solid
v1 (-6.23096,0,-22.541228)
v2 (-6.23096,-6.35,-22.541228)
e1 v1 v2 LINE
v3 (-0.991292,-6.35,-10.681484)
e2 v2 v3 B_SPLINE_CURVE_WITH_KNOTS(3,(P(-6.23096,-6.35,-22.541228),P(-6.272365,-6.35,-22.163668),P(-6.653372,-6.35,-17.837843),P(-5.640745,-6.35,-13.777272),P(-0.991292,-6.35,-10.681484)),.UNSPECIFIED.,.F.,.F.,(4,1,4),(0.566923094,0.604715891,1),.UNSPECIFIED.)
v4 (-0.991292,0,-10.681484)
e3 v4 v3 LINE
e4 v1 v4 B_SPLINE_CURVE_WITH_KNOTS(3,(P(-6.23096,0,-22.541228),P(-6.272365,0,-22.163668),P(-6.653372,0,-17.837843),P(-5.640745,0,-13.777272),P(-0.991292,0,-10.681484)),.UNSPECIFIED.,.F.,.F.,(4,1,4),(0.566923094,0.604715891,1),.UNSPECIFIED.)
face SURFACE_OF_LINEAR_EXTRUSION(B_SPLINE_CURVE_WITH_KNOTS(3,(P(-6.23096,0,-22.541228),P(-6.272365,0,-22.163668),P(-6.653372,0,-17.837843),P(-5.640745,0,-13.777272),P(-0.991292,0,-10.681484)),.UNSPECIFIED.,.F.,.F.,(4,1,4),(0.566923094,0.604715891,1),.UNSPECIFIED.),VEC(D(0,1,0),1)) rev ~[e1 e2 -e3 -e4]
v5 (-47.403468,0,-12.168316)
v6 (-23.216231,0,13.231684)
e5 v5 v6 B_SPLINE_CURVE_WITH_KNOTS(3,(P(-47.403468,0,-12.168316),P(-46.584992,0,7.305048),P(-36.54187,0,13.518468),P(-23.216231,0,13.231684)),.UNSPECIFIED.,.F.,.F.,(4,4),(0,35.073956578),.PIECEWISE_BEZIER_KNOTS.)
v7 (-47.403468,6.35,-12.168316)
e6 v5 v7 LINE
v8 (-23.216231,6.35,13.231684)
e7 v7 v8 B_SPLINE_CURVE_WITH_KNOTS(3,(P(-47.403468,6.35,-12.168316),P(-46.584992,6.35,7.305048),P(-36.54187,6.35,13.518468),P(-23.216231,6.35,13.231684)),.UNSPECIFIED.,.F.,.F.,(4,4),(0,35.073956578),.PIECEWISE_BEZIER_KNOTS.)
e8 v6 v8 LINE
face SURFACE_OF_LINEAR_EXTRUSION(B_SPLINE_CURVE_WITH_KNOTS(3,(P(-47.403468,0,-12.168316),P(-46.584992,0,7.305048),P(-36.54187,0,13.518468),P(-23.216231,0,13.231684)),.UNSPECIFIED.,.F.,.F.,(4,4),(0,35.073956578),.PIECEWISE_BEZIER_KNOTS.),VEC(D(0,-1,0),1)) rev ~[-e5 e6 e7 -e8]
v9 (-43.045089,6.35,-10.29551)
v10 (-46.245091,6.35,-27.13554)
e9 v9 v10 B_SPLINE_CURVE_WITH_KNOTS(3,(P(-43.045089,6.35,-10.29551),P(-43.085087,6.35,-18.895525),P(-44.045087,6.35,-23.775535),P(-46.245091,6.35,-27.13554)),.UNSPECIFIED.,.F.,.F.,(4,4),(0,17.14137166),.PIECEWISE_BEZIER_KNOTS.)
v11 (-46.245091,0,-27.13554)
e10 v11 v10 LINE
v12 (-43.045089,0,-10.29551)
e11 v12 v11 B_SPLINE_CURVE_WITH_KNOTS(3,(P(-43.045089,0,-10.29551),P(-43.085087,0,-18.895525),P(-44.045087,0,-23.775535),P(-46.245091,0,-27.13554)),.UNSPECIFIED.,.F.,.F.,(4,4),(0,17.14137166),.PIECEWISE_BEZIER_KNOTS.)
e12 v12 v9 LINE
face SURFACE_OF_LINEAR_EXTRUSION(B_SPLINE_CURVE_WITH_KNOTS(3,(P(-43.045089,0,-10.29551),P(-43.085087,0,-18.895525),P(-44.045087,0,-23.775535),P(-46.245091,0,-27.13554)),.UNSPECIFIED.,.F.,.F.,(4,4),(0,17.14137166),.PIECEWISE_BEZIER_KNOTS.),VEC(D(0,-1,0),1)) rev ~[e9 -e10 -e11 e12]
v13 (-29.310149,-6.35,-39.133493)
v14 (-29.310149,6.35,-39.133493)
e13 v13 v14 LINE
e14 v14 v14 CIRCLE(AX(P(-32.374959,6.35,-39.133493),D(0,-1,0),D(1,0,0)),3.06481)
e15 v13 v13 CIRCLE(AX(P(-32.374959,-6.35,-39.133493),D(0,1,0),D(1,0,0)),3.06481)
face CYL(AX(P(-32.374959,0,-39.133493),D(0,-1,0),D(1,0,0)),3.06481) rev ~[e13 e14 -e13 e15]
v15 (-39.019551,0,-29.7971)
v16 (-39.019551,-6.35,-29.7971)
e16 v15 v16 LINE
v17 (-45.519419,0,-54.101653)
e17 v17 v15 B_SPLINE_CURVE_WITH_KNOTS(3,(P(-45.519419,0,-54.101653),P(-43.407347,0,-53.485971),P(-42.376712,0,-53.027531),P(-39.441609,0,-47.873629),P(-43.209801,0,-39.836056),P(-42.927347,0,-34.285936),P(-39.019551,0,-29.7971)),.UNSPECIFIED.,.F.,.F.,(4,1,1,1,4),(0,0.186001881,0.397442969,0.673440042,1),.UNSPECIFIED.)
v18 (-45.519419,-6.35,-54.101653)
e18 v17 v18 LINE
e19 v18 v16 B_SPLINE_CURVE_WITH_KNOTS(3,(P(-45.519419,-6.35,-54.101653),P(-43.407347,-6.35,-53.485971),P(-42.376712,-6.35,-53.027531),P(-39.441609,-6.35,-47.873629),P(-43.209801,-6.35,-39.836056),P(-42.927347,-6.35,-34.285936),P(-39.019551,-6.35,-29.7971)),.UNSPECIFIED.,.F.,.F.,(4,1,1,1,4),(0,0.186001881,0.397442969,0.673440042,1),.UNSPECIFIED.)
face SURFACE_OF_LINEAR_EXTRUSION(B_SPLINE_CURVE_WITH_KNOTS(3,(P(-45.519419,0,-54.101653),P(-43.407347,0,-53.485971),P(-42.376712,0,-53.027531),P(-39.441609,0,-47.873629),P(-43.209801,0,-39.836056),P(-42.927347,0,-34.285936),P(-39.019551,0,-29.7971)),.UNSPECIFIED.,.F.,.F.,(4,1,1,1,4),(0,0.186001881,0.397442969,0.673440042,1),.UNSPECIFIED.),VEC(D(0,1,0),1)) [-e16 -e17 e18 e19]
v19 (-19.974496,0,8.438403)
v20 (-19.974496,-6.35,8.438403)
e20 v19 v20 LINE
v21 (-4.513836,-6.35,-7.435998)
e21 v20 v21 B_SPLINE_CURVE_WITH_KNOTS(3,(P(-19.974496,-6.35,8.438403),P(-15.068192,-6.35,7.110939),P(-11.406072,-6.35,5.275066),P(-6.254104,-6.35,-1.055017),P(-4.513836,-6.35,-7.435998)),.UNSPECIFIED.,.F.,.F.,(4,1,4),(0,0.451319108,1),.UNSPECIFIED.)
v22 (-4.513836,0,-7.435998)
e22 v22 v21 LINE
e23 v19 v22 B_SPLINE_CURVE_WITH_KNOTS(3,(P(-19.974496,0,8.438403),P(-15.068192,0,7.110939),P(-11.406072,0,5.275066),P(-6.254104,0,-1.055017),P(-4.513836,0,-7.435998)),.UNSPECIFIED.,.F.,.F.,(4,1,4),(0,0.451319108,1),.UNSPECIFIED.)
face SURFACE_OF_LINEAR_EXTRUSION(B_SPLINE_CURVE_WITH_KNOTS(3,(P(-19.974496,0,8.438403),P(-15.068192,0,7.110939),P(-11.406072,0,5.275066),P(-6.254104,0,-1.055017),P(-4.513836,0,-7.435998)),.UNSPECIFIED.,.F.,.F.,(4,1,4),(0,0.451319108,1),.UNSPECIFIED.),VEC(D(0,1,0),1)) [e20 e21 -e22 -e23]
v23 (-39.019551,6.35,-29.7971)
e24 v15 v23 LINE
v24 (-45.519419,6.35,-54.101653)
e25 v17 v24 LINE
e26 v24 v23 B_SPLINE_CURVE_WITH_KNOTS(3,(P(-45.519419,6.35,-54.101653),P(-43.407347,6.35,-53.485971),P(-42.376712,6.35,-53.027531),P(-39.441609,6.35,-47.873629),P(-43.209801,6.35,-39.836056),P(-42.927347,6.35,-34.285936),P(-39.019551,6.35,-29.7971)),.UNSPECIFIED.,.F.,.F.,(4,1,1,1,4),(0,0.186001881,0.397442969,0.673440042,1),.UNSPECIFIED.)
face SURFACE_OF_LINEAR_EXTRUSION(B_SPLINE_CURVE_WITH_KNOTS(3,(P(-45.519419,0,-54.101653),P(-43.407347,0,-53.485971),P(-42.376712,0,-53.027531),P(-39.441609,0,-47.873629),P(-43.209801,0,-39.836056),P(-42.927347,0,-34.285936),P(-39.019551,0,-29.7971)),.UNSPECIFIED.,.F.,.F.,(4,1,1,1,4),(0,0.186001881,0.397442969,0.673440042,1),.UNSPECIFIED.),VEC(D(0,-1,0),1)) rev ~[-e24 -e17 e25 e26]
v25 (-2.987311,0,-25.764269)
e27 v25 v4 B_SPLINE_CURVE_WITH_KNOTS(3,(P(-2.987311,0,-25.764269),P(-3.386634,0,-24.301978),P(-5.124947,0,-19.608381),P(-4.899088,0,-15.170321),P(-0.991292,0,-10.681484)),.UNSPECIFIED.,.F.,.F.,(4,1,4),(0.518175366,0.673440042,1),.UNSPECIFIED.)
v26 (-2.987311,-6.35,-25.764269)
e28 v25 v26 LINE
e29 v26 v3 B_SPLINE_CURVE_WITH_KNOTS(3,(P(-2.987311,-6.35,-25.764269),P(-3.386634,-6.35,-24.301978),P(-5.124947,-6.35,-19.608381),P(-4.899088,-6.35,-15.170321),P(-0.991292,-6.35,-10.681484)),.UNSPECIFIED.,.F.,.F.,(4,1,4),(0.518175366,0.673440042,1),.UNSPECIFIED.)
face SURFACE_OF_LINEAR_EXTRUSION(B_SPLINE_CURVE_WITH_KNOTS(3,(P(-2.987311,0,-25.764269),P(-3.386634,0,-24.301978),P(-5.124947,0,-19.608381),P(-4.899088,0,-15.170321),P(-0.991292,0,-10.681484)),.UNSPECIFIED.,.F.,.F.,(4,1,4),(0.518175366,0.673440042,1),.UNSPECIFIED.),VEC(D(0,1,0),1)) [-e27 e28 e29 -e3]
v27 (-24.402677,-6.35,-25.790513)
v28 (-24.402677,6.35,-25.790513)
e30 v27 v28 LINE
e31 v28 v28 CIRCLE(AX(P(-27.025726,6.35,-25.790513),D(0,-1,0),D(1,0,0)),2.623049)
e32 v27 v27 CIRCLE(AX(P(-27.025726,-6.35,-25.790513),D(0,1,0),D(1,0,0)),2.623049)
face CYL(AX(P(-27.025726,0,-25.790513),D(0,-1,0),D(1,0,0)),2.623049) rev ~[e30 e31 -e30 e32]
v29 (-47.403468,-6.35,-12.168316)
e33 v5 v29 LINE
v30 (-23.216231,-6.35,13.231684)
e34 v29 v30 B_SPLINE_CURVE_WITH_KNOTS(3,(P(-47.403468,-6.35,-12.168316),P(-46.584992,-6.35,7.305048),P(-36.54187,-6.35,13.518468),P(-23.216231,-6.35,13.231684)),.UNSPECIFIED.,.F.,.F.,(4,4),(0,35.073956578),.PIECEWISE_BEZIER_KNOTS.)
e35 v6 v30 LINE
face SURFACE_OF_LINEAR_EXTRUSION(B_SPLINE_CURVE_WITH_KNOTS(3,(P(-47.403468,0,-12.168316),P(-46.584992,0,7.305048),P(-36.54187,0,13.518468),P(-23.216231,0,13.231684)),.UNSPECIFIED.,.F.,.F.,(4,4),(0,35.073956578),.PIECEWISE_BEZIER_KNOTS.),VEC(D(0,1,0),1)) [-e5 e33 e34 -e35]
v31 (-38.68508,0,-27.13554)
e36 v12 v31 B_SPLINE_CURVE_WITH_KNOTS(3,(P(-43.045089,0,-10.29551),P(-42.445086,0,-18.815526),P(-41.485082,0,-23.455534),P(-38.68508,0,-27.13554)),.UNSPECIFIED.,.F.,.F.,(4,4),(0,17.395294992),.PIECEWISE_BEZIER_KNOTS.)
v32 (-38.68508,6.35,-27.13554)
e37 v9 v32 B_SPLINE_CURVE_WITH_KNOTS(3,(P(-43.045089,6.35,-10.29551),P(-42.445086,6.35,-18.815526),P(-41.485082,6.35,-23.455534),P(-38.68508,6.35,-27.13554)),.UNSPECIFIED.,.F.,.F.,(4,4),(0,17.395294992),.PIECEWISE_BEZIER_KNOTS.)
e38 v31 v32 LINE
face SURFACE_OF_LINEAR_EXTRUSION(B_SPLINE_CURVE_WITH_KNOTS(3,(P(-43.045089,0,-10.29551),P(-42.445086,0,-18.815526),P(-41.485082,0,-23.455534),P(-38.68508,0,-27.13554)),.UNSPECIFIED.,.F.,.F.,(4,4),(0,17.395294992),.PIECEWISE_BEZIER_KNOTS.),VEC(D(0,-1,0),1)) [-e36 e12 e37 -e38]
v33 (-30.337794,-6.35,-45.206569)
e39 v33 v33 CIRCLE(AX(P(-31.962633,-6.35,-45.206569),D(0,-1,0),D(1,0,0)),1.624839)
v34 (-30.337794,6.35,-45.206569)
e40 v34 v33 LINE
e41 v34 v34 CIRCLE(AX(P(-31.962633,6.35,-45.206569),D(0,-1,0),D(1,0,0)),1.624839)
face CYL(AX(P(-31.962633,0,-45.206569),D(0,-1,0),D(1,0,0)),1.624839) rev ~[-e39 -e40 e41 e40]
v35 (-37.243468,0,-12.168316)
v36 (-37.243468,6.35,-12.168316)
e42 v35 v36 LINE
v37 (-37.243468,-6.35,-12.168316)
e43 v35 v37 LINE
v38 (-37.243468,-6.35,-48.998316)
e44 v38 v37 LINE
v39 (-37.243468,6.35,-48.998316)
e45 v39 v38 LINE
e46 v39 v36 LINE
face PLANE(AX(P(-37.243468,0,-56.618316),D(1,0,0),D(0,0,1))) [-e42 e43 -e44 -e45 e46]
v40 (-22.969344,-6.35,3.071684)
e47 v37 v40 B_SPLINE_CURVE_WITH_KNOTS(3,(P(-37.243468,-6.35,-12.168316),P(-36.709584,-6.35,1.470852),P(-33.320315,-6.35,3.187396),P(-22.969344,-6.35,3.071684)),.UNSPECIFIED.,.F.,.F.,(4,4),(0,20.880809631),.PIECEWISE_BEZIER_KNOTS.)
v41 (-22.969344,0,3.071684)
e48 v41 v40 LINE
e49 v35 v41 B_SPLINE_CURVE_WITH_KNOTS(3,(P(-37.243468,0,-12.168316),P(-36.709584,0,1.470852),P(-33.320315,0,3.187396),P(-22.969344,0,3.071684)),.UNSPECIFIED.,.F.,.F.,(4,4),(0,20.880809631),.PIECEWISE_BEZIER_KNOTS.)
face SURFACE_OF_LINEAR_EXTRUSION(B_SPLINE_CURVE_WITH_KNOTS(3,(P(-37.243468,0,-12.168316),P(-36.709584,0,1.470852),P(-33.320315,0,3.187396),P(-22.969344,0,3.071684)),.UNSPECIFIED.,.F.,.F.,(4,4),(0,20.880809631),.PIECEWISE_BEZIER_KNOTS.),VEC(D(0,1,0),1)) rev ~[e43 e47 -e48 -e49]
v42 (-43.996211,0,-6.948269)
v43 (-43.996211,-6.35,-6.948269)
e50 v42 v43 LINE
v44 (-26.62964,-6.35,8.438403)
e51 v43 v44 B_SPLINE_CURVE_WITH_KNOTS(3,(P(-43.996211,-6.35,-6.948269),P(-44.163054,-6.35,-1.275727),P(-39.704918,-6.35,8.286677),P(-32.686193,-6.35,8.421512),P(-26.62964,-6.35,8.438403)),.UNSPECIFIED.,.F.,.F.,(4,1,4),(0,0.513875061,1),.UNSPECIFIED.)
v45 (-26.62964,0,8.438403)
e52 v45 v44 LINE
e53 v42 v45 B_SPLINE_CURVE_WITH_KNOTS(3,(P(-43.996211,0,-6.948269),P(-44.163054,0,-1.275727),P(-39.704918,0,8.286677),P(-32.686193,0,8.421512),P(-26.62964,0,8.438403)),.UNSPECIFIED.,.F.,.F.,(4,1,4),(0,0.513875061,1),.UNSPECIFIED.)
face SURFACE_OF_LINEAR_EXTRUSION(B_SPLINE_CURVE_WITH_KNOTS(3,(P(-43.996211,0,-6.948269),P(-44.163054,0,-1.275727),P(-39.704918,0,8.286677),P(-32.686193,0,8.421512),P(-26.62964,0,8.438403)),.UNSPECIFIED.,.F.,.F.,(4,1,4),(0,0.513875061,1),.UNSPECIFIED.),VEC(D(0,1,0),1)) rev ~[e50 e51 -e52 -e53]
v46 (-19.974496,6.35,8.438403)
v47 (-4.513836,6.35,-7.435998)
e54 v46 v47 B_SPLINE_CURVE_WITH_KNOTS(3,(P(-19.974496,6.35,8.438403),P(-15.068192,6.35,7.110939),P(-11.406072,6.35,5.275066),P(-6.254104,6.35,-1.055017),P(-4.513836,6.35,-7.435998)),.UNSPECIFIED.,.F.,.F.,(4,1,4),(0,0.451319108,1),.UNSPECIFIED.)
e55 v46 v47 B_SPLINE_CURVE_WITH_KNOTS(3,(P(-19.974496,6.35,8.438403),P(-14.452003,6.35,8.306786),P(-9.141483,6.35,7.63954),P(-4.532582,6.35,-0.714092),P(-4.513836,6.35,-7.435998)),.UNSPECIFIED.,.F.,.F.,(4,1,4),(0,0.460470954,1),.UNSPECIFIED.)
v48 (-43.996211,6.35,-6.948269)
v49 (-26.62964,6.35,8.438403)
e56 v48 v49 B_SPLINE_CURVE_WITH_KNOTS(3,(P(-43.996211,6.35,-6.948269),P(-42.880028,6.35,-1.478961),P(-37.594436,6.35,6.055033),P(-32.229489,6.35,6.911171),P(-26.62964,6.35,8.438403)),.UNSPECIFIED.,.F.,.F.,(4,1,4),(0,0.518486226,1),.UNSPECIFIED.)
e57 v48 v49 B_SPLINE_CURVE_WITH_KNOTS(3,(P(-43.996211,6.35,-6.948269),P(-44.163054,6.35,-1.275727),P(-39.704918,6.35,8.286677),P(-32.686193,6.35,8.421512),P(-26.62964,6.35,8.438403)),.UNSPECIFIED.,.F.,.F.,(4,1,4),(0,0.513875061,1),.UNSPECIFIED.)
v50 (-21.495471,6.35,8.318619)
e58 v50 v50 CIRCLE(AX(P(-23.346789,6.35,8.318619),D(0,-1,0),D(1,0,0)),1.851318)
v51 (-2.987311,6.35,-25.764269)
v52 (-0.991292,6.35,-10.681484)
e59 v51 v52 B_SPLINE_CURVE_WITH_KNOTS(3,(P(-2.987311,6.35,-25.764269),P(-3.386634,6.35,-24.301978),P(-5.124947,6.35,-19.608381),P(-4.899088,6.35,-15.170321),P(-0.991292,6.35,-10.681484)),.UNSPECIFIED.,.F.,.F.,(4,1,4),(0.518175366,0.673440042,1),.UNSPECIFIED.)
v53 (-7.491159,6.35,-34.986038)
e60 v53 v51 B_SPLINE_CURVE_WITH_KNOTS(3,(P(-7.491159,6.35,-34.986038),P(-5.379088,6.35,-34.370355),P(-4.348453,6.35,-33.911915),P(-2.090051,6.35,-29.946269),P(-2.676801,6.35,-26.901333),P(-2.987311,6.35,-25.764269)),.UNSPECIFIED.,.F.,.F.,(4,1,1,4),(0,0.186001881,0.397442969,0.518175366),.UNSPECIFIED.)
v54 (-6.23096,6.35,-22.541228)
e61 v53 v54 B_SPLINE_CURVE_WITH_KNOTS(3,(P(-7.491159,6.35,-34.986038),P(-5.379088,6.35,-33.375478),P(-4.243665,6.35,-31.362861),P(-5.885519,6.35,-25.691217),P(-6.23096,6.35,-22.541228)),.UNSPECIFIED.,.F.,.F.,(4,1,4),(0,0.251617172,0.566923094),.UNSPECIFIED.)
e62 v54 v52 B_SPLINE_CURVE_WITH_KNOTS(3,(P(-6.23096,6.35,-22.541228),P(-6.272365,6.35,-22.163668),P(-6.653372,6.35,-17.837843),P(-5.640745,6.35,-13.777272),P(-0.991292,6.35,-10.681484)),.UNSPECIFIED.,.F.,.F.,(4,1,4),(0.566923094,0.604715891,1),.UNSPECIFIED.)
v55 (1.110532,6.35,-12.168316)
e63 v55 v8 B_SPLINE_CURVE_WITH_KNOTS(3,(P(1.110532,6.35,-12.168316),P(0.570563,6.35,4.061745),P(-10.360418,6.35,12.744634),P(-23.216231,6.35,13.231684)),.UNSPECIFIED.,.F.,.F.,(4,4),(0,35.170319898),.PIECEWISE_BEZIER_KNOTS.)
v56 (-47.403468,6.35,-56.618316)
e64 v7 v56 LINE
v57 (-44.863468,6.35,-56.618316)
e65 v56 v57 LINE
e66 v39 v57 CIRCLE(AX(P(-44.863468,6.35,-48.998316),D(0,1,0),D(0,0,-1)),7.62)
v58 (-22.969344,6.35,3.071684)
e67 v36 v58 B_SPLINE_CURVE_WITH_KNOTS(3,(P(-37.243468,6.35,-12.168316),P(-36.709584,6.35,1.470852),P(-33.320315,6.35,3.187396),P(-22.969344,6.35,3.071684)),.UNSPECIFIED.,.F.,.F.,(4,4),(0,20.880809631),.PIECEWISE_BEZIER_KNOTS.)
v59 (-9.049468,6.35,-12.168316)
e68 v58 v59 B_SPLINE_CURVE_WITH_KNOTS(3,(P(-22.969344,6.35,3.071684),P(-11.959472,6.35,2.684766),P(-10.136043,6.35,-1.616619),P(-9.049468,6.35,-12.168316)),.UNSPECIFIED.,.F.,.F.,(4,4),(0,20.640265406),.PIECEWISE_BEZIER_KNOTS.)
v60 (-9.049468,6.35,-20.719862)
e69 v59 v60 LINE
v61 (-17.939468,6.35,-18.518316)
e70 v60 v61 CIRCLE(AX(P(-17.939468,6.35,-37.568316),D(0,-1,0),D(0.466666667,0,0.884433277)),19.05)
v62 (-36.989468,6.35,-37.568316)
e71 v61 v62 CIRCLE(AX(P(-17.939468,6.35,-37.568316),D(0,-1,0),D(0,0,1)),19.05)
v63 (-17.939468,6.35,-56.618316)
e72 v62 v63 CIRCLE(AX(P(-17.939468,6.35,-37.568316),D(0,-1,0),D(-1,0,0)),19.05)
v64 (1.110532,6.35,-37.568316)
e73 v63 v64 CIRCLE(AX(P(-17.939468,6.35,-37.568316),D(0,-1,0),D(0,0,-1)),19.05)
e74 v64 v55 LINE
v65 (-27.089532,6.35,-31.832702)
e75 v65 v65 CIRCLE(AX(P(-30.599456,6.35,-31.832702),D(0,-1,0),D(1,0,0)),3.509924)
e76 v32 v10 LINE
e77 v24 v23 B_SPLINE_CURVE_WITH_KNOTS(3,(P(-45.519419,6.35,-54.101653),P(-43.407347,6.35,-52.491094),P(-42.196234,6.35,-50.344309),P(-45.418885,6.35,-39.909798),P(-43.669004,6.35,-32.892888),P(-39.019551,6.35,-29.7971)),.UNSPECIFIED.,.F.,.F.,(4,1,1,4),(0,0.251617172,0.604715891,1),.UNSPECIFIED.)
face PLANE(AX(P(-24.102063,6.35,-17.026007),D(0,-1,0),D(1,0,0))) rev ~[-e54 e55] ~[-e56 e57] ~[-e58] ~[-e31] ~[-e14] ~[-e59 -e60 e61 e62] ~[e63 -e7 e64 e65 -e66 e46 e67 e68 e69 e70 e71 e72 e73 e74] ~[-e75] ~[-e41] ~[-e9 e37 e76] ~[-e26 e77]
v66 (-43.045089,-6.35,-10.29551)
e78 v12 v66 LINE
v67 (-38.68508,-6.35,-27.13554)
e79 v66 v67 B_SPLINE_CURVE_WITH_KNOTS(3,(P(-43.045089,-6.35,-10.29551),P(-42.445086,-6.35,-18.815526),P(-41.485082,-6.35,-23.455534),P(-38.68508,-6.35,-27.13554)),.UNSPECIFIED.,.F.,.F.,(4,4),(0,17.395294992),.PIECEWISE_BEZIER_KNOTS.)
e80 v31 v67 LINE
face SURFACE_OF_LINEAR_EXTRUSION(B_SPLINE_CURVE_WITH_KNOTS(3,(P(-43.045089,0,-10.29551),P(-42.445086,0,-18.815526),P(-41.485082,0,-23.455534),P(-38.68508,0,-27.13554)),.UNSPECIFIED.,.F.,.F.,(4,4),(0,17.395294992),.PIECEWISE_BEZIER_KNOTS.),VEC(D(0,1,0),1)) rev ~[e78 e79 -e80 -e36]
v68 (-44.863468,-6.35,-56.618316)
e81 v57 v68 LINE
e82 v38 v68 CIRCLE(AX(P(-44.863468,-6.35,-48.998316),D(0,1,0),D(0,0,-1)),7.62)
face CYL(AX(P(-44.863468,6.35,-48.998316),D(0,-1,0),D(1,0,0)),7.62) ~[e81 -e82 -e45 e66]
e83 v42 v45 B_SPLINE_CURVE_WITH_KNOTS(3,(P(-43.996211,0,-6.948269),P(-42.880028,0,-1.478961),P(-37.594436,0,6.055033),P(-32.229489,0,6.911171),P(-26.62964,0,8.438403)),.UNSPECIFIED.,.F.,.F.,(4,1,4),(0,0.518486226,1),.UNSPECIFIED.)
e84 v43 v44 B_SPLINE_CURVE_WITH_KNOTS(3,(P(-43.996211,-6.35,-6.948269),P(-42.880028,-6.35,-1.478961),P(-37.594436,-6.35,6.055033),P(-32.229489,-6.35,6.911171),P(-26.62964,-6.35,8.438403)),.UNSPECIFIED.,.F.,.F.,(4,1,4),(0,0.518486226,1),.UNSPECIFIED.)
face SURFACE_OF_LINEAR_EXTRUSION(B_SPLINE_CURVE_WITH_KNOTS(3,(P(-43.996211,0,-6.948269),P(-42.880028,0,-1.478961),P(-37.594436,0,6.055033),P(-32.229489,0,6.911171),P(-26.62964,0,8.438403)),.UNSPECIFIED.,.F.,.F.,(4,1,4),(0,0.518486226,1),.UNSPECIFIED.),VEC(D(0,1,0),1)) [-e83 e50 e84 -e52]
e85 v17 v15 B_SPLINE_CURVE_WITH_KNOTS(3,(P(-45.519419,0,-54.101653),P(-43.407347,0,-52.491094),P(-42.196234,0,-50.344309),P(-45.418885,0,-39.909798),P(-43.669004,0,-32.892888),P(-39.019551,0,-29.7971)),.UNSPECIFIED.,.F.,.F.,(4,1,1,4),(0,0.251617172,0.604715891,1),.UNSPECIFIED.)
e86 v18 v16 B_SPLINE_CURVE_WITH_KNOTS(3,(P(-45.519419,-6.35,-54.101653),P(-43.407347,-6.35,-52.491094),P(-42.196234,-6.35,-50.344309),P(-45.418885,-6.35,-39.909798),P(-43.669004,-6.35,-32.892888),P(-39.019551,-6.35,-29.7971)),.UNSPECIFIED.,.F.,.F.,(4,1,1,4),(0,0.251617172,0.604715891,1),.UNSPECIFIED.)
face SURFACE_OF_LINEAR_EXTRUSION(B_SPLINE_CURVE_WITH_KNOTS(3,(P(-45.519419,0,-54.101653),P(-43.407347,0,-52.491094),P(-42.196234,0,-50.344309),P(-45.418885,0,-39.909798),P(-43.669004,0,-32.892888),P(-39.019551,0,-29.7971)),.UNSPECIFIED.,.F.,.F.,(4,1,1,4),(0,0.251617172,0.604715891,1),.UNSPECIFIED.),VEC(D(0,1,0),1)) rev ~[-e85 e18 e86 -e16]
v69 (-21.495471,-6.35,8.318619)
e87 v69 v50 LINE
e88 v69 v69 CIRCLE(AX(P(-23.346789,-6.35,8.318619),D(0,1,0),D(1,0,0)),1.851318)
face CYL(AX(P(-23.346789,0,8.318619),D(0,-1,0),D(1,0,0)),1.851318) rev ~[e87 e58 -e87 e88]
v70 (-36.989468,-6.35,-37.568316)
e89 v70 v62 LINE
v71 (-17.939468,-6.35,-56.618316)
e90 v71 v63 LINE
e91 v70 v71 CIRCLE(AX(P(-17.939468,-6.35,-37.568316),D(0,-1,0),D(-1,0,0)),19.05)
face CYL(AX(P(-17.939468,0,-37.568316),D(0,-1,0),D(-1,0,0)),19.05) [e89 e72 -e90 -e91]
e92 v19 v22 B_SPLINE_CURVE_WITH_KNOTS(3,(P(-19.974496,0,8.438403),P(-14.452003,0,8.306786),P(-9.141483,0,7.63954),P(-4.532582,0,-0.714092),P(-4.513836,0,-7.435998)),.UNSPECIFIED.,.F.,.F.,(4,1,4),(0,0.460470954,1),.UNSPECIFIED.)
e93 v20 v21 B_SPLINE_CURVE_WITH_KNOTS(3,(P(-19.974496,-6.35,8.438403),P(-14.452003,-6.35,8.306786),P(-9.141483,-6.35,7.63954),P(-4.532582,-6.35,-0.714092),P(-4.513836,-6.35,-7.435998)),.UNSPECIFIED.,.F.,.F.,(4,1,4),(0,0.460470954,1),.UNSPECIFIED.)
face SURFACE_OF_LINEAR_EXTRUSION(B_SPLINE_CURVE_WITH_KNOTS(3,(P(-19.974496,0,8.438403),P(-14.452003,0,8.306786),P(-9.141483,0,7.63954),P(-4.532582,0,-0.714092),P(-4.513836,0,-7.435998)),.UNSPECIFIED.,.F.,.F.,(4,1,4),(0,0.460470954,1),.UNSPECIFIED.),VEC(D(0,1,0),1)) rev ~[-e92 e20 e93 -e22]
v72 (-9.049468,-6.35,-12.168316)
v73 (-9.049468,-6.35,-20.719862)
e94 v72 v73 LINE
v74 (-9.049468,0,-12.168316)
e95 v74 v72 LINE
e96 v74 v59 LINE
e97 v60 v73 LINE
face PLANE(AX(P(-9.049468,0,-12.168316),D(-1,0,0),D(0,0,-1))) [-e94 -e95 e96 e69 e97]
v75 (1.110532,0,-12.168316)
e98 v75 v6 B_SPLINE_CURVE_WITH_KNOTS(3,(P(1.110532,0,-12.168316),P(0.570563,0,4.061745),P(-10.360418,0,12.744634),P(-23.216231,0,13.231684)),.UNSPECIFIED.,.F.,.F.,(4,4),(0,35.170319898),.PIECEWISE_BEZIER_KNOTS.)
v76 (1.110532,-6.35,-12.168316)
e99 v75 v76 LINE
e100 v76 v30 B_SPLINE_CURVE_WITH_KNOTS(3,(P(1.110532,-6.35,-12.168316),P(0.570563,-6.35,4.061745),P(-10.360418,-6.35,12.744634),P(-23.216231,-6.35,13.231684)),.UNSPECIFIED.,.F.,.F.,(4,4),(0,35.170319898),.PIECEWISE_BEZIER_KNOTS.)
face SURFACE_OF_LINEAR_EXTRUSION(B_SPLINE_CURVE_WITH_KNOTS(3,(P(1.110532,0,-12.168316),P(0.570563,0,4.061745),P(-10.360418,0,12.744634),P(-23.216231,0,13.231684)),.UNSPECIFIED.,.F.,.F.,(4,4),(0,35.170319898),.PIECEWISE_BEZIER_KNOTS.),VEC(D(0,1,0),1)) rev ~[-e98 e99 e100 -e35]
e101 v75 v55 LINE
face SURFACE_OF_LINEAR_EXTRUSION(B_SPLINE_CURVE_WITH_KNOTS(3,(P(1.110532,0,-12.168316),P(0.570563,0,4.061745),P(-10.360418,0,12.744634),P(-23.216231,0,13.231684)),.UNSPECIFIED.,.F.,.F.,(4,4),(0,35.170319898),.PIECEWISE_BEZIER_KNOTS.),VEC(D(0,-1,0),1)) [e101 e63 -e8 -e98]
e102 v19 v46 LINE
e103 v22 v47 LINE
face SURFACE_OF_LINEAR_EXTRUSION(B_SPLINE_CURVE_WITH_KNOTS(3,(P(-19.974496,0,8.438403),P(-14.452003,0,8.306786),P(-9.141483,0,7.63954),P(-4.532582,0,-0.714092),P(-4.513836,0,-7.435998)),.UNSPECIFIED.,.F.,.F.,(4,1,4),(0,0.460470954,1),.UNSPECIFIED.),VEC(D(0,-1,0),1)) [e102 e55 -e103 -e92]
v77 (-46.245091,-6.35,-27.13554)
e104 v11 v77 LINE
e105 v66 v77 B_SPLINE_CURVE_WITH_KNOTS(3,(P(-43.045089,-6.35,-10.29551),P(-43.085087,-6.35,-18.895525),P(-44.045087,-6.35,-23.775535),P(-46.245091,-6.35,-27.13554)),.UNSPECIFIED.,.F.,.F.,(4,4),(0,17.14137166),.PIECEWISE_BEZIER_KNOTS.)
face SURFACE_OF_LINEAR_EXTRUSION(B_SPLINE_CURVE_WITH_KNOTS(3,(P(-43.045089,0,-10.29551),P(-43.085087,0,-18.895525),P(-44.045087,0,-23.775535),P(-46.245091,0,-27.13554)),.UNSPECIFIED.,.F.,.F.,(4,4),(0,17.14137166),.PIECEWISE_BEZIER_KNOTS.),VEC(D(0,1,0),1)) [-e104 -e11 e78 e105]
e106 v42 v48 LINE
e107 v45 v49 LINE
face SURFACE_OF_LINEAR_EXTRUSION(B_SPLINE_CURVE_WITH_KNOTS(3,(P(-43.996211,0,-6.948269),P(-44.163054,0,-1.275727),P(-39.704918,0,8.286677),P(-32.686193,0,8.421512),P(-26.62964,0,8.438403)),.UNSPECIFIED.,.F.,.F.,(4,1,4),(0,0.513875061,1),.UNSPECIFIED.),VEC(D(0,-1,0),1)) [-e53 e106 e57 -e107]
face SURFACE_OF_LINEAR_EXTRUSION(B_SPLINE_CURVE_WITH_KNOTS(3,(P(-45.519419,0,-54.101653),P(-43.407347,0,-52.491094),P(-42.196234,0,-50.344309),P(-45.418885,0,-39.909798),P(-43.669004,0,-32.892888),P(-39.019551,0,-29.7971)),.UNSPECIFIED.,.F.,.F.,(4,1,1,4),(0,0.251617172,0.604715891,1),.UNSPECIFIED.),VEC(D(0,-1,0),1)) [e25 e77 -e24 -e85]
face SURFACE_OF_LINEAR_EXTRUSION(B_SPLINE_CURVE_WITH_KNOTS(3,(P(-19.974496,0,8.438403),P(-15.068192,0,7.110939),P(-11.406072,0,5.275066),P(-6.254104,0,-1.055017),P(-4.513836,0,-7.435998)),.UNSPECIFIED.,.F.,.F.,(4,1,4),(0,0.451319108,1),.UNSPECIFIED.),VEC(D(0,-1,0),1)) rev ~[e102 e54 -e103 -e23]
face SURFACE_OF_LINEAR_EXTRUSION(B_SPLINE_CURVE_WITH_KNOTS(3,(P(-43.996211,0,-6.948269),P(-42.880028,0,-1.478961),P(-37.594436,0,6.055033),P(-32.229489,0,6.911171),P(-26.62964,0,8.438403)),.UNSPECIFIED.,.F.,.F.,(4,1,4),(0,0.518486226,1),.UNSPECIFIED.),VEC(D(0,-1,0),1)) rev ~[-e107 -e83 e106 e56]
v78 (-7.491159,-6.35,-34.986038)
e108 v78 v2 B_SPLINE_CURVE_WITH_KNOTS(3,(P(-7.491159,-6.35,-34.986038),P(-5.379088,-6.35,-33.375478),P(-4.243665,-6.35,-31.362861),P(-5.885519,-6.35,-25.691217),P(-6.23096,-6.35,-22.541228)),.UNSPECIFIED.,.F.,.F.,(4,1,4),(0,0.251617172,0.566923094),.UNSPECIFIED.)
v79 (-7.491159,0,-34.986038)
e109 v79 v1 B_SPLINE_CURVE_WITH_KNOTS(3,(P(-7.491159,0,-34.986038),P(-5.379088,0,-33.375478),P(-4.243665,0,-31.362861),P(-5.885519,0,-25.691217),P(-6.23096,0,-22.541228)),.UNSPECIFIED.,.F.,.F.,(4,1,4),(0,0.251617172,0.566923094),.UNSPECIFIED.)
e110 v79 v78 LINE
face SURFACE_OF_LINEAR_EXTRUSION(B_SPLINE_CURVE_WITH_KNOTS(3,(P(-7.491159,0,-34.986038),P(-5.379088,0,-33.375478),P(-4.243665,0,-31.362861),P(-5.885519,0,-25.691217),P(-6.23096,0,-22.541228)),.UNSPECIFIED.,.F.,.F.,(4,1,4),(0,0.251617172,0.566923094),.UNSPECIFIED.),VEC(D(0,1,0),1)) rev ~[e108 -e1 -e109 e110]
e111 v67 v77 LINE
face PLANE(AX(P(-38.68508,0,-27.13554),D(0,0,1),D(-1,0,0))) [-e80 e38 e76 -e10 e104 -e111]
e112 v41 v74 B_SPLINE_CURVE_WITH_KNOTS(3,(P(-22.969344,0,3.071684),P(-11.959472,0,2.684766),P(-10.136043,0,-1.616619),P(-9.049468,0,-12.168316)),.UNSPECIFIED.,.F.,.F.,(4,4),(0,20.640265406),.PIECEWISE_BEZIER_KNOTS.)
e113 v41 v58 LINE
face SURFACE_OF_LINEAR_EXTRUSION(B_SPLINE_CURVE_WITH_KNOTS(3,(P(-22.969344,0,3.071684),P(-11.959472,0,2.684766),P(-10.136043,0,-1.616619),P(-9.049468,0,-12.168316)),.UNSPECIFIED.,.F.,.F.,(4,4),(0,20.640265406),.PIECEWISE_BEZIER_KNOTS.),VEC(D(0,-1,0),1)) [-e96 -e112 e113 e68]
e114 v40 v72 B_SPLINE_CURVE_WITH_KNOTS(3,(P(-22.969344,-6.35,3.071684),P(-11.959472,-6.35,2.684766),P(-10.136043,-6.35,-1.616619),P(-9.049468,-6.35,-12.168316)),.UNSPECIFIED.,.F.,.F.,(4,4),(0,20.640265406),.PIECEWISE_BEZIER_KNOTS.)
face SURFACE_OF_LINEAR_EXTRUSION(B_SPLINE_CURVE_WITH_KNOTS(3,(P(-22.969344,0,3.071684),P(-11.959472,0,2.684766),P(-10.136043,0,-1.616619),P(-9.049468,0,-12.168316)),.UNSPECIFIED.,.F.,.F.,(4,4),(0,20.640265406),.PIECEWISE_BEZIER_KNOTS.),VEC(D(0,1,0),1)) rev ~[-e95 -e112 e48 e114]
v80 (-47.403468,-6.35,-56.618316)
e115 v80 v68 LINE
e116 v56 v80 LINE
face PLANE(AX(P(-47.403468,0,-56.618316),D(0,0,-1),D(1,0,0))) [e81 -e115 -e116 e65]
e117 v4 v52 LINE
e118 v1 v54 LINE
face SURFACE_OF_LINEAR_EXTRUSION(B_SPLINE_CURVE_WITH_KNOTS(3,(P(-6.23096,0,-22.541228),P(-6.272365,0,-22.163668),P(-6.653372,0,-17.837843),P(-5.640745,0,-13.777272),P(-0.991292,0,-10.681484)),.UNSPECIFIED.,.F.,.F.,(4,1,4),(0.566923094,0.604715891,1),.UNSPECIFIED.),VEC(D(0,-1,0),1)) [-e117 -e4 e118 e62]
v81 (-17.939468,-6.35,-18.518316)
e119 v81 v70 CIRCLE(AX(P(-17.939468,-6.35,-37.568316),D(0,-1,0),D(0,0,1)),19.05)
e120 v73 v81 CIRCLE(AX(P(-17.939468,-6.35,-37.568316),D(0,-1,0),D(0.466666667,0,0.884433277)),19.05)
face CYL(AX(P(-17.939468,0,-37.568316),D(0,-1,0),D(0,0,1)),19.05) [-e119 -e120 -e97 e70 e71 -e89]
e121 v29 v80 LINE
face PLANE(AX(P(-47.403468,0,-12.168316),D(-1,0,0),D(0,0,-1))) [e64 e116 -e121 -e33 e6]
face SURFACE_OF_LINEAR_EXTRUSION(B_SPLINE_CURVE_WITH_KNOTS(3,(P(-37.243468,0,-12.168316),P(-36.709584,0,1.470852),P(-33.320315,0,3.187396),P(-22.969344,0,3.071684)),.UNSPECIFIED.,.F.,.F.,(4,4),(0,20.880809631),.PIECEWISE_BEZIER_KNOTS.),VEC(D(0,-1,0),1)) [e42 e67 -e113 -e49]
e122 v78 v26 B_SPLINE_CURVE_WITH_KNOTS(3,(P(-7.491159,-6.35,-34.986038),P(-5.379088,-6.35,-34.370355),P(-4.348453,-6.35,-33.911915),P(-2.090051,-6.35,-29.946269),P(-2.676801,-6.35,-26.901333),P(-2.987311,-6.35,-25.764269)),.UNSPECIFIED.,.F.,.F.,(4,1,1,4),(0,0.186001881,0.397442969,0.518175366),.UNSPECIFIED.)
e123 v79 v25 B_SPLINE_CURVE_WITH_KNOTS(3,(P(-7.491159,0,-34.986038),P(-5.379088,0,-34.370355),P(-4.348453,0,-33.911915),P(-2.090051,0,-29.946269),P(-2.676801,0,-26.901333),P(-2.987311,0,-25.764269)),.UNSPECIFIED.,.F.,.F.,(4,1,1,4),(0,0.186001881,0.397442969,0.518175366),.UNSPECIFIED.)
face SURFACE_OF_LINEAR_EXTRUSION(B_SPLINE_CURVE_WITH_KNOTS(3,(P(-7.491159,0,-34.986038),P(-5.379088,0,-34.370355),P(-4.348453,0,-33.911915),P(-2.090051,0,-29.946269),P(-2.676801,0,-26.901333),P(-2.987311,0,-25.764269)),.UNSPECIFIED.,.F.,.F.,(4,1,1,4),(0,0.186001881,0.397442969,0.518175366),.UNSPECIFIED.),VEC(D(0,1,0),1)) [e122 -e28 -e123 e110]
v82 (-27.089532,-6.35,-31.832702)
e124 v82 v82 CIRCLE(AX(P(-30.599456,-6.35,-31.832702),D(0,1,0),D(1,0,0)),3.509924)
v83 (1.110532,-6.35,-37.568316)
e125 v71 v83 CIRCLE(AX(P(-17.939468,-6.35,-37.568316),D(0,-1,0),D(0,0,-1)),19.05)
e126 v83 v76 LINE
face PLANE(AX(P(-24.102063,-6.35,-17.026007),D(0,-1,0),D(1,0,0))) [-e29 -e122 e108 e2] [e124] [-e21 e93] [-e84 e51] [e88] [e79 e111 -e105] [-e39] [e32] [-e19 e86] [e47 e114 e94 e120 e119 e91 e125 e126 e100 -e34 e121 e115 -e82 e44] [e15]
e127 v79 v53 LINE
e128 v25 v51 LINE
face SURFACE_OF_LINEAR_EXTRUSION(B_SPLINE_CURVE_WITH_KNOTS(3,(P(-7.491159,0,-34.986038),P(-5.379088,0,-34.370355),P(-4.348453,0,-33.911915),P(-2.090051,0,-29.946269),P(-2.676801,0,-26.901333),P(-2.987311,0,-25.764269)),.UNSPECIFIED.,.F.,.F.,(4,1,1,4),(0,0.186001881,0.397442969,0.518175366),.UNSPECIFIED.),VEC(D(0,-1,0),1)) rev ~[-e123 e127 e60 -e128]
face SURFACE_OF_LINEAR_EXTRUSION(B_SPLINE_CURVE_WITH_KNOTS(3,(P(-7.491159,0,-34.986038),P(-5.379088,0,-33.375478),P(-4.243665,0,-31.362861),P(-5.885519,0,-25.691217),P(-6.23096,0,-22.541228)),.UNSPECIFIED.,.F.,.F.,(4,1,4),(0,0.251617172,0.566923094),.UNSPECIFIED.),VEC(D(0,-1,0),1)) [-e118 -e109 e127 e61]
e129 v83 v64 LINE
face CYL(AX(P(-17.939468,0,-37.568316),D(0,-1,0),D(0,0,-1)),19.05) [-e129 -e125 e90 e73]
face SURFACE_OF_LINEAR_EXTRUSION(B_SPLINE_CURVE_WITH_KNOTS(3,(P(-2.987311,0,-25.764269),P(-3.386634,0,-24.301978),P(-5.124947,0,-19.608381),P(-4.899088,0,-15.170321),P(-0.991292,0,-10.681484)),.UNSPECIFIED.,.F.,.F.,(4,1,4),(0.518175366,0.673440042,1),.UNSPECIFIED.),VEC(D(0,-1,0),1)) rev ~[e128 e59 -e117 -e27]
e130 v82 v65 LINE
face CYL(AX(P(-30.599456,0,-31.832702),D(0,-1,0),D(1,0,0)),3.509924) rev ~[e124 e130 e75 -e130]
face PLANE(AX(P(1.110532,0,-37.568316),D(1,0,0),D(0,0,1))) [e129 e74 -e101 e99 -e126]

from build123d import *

# Parameters (mm, degrees)
F1_DEPTH = 6.35
F2_R     = 7.62
F3_R     = 1.851317794
F3_R_2   = 2.623048948
F3_R_3   = 3.5099243314
F3_R_4   = 3.0648100187
F3_R_5   = 1.624839295
F4_DEPTH = 12.7


# Not quite as in the source:
# - a feature names something its author has since deleted; it is built from what else it names


with BuildPart() as f1:
    # F0 (on Front) → F1 (new body, symmetric)
    with BuildSketch(Plane.XZ):
        with BuildLine():
            Line((-47.4034676004, -12.1683157229), (-47.4034676004, -56.6183157229))
            Line((-47.4034676004, -56.6183157229), (-37.2434676004, -56.6183157229))
            Line((-37.2434676004, -56.6183157229), (-37.2434676004, -12.1683157229))
            add(Edge.make_bspline(
                [(-37.2434676004, -12.1683157229), (-36.7095838945, 1.4708520701), (-33.3203151822, 3.1873958426), (-22.9693437804, 3.0716842771)],
                knots=[0, 0, 0, 0, 20.8808096306, 20.8808096306, 20.8808096306, 20.8808096306], degree=3))
            add(Edge.make_bspline(
                [(-22.9693437804, 3.0716842771), (-11.9594718681, 2.6847659899), (-10.1360433424, -1.6166193699), (-9.0494676004, -12.1683158262)],
                knots=[0, 0, 0, 0, 20.6402654057, 20.6402654057, 20.6402654057, 20.6402654057], degree=3))
            Line((-9.0494676004, -12.1683158262), (-9.0494676004, -20.7198617879))
            ThreePointArc((-9.0494676004, -20.7198617879), (-7.6000300221, -21.5683616428), (-6.2309603269, -22.5412282663))
            add(Edge.make_bspline(
                [(-6.2309603269, -22.5412282663), (-6.2723652172, -22.1636683346), (-6.6533718861, -17.8378431816), (-5.6407446666, -13.777271871), (-0.9912915077, -10.6814840494)],
                knots=[0.5669230938, 0.5669230938, 0.5669230938, 0.5669230938, 0.6047158912, 1, 1, 1, 1], degree=3))
            add(Edge.make_bspline(
                [(-2.9873109532, -25.7642693151), (-3.3866343808, -24.3019783121), (-5.124946874, -19.6083809219), (-4.8990877844, -15.1703206189), (-0.9912915077, -10.6814840494)],
                knots=[0.5181753665, 0.5181753665, 0.5181753665, 0.5181753665, 0.6734400418, 1, 1, 1, 1], degree=3))
            ThreePointArc((-2.9873109532, -25.7642693151), (0.0569359866, -31.3207595659), (1.1105323996, -37.5683157229))
            Line((1.1105323996, -37.5683157229), (1.1105323996, -12.1683157229))
            add(Edge.make_bspline(
                [(1.1105323996, -12.1683157229), (0.5705629619, 4.0617453953), (-10.3604181223, 12.7446337565), (-23.2162306761, 13.2316842771)],
                knots=[0, 0, 0, 0, 35.1703198982, 35.1703198982, 35.1703198982, 35.1703198982], degree=3))
            add(Edge.make_bspline(
                [(-47.4034676004, -12.1683157229), (-46.5849920508, 7.3050484799), (-36.5418703402, 13.5184679613), (-23.2162306761, 13.2316842771)],
                knots=[0, 0, 0, 0, 35.0739565779, 35.0739565779, 35.0739565779, 35.0739565779], degree=3))
        make_face()
        with BuildLine():
            add(Edge.make_bspline(
                [(-45.5194190145, -54.1016533971), (-43.4073472429, -53.4859708194), (-42.3767122517, -53.0275311605), (-39.4416086551, -47.8736285865), (-43.2098006647, -39.8360561852), (-42.9273473132, -34.2859363798), (-39.0195510365, -29.7970998103)],
                knots=[0, 0, 0, 0, 0.1860018813, 0.3974429686, 0.6734400418, 1, 1, 1, 1], degree=3))
            add(Edge.make_bspline(
                [(-45.5194190145, -54.1016533971), (-43.4073472429, -52.4910938487), (-42.1962339672, -50.3443092376), (-45.4188846713, -39.9097980212), (-43.6690041954, -32.8928876319), (-39.0195510365, -29.7970998103)],
                knots=[0, 0, 0, 0, 0.2516171716, 0.6047158912, 1, 1, 1, 1], degree=3))
        make_face(mode=Mode.SUBTRACT)
        with BuildLine():
            add(Edge.make_bspline(
                [(-43.0450886488, -10.2955098264), (-43.0850870907, -18.8955254853), (-44.0450869501, -23.7755347043), (-46.2450906634, -27.1355397999)],
                knots=[0, 0, 0, 0, 17.1413716605, 17.1413716605, 17.1413716605, 17.1413716605], degree=3))
            add(Edge.make_bspline(
                [(-43.0450886488, -10.2955098264), (-42.4450859427, -18.8155258074), (-41.4850823581, -23.4555341303), (-38.685079664, -27.1355397999)],
                knots=[0, 0, 0, 0, 17.395294992, 17.395294992, 17.395294992, 17.395294992], degree=3))
            Line((-38.685079664, -27.1355397999), (-46.2450906634, -27.1355397999))
        make_face(mode=Mode.SUBTRACT)
        with BuildLine():
            add(Edge.make_bspline(
                [(-43.9962111413, -6.9482689141), (-42.8800281093, -1.4789610887), (-37.594435646, 6.055033296), (-32.2294885174, 6.9111710616), (-26.6296397895, 8.4384027869)],
                knots=[0, 0, 0, 0, 0.5184862256, 1, 1, 1, 1], degree=3))
            add(Edge.make_bspline(
                [(-43.9962111413, -6.9482689141), (-44.1630539416, -1.2757268376), (-39.7049183871, 8.2866771022), (-32.6861925423, 8.4215123206), (-26.6296397895, 8.4384027869)],
                knots=[0, 0, 0, 0, 0.513875061, 1, 1, 1, 1], degree=3))
        make_face(mode=Mode.SUBTRACT)
        with BuildLine():
            add(Edge.make_bspline(
                [(-19.9744962156, 8.4384027869), (-15.0681919771, 7.110938792), (-11.4060719241, 5.2750660976), (-6.2541036922, -1.0550173553), (-4.5138360001, -7.4359978316)],
                knots=[0, 0, 0, 0, 0.4513191083, 1, 1, 1, 1], degree=3))
            add(Edge.make_bspline(
                [(-19.9744962156, 8.4384027869), (-14.4520029301, 8.3067857058), (-9.1414830202, 7.6395398298), (-4.5325819981, -0.7140918586), (-4.5138360001, -7.4359978316)],
                knots=[0, 0, 0, 0, 0.4604709536, 1, 1, 1, 1], degree=3))
        make_face(mode=Mode.SUBTRACT)
        with BuildLine():
            ThreePointArc((-17.9394676004, -18.5183157229), (-31.409851782, -24.0979315413), (-36.9894676004, -37.5683157229))
            Line((-36.9894676004, -37.5683157229), (-17.9394676004, -37.5683157229))
            Line((-17.9394676004, -37.5683157229), (-17.9394676004, -18.5183157229))
        make_face()
        with BuildLine():
            ThreePointArc((-17.9394676004, -56.6183157229), (-4.4690834188, -51.0386999045), (1.1105323996, -37.5683157229))
            ThreePointArc((1.1105323996, -37.5683157229), (0.0569359866, -31.3207595659), (-2.9873109532, -25.7642693151))
            add(Edge.make_bspline(
                [(-7.4911594857, -34.9860376362), (-5.3790877141, -34.3703550585), (-4.3484527229, -33.9119153996), (-2.0900506569, -29.9462685874), (-2.6768006917, -26.9013334848), (-2.9873109532, -25.7642693151)],
                knots=[0, 0, 0, 0, 0.1860018813, 0.3974429686, 0.5181753665, 0.5181753665, 0.5181753665, 0.5181753665], degree=3))
            add(Edge.make_bspline(
                [(-7.4911594857, -34.9860376362), (-5.3790877141, -33.3754780878), (-4.243665121, -31.362860607), (-5.8855186547, -25.6912169104), (-6.2309603269, -22.5412282663)],
                knots=[0, 0, 0, 0, 0.2516171716, 0.5669230938, 0.5669230938, 0.5669230938, 0.5669230938], degree=3))
            ThreePointArc((-6.2309603269, -22.5412282663), (-7.6000300221, -21.5683616428), (-9.0494676004, -20.7198617879))
            ThreePointArc((-9.0494676004, -20.7198617879), (-13.3601962316, -19.0768913935), (-17.9394676004, -18.5183157229))
            Line((-17.9394676004, -18.5183157229), (-17.9394676004, -37.5683157229))
            Line((-17.9394676004, -37.5683157229), (-17.9394676004, -56.6183157229))
        make_face()
        with BuildLine():
            ThreePointArc((-36.9894676004, -37.5683157229), (-31.409851782, -51.0386999045), (-17.9394676004, -56.6183157229))
            Line((-17.9394676004, -56.6183157229), (-17.9394676004, -37.5683157229))
            Line((-17.9394676004, -37.5683157229), (-36.9894676004, -37.5683157229))
        make_face()
    extrude(amount=F1_DEPTH, both=True)

    # F2
    f2_edges = [f1.edges().sort_by_distance(p)[0] for p in [
        (-37.243468, 0, -56.618316),
    ]]
    fillet(f2_edges, radius=F2_R)

    # F3 (on Front) → F4 (cut, symmetric)
    with BuildSketch(Plane.XZ):
        with Locations((-23.3467891812, 8.3186188713)):
            Circle(F3_R)
        with Locations((-27.0257256925, -25.7905125618)):
            Circle(F3_R_2)
        with Locations((-30.5994562805, -31.8327024579)):
            Circle(F3_R_3)
        with Locations((-32.374959439, -39.1334928572)):
            Circle(F3_R_4)
        with Locations((-31.9626331329, -45.2065691352)):
            Circle(F3_R_5)
    extrude(amount=F4_DEPTH, both=True, mode=Mode.SUBTRACT)


solid = f1.part
